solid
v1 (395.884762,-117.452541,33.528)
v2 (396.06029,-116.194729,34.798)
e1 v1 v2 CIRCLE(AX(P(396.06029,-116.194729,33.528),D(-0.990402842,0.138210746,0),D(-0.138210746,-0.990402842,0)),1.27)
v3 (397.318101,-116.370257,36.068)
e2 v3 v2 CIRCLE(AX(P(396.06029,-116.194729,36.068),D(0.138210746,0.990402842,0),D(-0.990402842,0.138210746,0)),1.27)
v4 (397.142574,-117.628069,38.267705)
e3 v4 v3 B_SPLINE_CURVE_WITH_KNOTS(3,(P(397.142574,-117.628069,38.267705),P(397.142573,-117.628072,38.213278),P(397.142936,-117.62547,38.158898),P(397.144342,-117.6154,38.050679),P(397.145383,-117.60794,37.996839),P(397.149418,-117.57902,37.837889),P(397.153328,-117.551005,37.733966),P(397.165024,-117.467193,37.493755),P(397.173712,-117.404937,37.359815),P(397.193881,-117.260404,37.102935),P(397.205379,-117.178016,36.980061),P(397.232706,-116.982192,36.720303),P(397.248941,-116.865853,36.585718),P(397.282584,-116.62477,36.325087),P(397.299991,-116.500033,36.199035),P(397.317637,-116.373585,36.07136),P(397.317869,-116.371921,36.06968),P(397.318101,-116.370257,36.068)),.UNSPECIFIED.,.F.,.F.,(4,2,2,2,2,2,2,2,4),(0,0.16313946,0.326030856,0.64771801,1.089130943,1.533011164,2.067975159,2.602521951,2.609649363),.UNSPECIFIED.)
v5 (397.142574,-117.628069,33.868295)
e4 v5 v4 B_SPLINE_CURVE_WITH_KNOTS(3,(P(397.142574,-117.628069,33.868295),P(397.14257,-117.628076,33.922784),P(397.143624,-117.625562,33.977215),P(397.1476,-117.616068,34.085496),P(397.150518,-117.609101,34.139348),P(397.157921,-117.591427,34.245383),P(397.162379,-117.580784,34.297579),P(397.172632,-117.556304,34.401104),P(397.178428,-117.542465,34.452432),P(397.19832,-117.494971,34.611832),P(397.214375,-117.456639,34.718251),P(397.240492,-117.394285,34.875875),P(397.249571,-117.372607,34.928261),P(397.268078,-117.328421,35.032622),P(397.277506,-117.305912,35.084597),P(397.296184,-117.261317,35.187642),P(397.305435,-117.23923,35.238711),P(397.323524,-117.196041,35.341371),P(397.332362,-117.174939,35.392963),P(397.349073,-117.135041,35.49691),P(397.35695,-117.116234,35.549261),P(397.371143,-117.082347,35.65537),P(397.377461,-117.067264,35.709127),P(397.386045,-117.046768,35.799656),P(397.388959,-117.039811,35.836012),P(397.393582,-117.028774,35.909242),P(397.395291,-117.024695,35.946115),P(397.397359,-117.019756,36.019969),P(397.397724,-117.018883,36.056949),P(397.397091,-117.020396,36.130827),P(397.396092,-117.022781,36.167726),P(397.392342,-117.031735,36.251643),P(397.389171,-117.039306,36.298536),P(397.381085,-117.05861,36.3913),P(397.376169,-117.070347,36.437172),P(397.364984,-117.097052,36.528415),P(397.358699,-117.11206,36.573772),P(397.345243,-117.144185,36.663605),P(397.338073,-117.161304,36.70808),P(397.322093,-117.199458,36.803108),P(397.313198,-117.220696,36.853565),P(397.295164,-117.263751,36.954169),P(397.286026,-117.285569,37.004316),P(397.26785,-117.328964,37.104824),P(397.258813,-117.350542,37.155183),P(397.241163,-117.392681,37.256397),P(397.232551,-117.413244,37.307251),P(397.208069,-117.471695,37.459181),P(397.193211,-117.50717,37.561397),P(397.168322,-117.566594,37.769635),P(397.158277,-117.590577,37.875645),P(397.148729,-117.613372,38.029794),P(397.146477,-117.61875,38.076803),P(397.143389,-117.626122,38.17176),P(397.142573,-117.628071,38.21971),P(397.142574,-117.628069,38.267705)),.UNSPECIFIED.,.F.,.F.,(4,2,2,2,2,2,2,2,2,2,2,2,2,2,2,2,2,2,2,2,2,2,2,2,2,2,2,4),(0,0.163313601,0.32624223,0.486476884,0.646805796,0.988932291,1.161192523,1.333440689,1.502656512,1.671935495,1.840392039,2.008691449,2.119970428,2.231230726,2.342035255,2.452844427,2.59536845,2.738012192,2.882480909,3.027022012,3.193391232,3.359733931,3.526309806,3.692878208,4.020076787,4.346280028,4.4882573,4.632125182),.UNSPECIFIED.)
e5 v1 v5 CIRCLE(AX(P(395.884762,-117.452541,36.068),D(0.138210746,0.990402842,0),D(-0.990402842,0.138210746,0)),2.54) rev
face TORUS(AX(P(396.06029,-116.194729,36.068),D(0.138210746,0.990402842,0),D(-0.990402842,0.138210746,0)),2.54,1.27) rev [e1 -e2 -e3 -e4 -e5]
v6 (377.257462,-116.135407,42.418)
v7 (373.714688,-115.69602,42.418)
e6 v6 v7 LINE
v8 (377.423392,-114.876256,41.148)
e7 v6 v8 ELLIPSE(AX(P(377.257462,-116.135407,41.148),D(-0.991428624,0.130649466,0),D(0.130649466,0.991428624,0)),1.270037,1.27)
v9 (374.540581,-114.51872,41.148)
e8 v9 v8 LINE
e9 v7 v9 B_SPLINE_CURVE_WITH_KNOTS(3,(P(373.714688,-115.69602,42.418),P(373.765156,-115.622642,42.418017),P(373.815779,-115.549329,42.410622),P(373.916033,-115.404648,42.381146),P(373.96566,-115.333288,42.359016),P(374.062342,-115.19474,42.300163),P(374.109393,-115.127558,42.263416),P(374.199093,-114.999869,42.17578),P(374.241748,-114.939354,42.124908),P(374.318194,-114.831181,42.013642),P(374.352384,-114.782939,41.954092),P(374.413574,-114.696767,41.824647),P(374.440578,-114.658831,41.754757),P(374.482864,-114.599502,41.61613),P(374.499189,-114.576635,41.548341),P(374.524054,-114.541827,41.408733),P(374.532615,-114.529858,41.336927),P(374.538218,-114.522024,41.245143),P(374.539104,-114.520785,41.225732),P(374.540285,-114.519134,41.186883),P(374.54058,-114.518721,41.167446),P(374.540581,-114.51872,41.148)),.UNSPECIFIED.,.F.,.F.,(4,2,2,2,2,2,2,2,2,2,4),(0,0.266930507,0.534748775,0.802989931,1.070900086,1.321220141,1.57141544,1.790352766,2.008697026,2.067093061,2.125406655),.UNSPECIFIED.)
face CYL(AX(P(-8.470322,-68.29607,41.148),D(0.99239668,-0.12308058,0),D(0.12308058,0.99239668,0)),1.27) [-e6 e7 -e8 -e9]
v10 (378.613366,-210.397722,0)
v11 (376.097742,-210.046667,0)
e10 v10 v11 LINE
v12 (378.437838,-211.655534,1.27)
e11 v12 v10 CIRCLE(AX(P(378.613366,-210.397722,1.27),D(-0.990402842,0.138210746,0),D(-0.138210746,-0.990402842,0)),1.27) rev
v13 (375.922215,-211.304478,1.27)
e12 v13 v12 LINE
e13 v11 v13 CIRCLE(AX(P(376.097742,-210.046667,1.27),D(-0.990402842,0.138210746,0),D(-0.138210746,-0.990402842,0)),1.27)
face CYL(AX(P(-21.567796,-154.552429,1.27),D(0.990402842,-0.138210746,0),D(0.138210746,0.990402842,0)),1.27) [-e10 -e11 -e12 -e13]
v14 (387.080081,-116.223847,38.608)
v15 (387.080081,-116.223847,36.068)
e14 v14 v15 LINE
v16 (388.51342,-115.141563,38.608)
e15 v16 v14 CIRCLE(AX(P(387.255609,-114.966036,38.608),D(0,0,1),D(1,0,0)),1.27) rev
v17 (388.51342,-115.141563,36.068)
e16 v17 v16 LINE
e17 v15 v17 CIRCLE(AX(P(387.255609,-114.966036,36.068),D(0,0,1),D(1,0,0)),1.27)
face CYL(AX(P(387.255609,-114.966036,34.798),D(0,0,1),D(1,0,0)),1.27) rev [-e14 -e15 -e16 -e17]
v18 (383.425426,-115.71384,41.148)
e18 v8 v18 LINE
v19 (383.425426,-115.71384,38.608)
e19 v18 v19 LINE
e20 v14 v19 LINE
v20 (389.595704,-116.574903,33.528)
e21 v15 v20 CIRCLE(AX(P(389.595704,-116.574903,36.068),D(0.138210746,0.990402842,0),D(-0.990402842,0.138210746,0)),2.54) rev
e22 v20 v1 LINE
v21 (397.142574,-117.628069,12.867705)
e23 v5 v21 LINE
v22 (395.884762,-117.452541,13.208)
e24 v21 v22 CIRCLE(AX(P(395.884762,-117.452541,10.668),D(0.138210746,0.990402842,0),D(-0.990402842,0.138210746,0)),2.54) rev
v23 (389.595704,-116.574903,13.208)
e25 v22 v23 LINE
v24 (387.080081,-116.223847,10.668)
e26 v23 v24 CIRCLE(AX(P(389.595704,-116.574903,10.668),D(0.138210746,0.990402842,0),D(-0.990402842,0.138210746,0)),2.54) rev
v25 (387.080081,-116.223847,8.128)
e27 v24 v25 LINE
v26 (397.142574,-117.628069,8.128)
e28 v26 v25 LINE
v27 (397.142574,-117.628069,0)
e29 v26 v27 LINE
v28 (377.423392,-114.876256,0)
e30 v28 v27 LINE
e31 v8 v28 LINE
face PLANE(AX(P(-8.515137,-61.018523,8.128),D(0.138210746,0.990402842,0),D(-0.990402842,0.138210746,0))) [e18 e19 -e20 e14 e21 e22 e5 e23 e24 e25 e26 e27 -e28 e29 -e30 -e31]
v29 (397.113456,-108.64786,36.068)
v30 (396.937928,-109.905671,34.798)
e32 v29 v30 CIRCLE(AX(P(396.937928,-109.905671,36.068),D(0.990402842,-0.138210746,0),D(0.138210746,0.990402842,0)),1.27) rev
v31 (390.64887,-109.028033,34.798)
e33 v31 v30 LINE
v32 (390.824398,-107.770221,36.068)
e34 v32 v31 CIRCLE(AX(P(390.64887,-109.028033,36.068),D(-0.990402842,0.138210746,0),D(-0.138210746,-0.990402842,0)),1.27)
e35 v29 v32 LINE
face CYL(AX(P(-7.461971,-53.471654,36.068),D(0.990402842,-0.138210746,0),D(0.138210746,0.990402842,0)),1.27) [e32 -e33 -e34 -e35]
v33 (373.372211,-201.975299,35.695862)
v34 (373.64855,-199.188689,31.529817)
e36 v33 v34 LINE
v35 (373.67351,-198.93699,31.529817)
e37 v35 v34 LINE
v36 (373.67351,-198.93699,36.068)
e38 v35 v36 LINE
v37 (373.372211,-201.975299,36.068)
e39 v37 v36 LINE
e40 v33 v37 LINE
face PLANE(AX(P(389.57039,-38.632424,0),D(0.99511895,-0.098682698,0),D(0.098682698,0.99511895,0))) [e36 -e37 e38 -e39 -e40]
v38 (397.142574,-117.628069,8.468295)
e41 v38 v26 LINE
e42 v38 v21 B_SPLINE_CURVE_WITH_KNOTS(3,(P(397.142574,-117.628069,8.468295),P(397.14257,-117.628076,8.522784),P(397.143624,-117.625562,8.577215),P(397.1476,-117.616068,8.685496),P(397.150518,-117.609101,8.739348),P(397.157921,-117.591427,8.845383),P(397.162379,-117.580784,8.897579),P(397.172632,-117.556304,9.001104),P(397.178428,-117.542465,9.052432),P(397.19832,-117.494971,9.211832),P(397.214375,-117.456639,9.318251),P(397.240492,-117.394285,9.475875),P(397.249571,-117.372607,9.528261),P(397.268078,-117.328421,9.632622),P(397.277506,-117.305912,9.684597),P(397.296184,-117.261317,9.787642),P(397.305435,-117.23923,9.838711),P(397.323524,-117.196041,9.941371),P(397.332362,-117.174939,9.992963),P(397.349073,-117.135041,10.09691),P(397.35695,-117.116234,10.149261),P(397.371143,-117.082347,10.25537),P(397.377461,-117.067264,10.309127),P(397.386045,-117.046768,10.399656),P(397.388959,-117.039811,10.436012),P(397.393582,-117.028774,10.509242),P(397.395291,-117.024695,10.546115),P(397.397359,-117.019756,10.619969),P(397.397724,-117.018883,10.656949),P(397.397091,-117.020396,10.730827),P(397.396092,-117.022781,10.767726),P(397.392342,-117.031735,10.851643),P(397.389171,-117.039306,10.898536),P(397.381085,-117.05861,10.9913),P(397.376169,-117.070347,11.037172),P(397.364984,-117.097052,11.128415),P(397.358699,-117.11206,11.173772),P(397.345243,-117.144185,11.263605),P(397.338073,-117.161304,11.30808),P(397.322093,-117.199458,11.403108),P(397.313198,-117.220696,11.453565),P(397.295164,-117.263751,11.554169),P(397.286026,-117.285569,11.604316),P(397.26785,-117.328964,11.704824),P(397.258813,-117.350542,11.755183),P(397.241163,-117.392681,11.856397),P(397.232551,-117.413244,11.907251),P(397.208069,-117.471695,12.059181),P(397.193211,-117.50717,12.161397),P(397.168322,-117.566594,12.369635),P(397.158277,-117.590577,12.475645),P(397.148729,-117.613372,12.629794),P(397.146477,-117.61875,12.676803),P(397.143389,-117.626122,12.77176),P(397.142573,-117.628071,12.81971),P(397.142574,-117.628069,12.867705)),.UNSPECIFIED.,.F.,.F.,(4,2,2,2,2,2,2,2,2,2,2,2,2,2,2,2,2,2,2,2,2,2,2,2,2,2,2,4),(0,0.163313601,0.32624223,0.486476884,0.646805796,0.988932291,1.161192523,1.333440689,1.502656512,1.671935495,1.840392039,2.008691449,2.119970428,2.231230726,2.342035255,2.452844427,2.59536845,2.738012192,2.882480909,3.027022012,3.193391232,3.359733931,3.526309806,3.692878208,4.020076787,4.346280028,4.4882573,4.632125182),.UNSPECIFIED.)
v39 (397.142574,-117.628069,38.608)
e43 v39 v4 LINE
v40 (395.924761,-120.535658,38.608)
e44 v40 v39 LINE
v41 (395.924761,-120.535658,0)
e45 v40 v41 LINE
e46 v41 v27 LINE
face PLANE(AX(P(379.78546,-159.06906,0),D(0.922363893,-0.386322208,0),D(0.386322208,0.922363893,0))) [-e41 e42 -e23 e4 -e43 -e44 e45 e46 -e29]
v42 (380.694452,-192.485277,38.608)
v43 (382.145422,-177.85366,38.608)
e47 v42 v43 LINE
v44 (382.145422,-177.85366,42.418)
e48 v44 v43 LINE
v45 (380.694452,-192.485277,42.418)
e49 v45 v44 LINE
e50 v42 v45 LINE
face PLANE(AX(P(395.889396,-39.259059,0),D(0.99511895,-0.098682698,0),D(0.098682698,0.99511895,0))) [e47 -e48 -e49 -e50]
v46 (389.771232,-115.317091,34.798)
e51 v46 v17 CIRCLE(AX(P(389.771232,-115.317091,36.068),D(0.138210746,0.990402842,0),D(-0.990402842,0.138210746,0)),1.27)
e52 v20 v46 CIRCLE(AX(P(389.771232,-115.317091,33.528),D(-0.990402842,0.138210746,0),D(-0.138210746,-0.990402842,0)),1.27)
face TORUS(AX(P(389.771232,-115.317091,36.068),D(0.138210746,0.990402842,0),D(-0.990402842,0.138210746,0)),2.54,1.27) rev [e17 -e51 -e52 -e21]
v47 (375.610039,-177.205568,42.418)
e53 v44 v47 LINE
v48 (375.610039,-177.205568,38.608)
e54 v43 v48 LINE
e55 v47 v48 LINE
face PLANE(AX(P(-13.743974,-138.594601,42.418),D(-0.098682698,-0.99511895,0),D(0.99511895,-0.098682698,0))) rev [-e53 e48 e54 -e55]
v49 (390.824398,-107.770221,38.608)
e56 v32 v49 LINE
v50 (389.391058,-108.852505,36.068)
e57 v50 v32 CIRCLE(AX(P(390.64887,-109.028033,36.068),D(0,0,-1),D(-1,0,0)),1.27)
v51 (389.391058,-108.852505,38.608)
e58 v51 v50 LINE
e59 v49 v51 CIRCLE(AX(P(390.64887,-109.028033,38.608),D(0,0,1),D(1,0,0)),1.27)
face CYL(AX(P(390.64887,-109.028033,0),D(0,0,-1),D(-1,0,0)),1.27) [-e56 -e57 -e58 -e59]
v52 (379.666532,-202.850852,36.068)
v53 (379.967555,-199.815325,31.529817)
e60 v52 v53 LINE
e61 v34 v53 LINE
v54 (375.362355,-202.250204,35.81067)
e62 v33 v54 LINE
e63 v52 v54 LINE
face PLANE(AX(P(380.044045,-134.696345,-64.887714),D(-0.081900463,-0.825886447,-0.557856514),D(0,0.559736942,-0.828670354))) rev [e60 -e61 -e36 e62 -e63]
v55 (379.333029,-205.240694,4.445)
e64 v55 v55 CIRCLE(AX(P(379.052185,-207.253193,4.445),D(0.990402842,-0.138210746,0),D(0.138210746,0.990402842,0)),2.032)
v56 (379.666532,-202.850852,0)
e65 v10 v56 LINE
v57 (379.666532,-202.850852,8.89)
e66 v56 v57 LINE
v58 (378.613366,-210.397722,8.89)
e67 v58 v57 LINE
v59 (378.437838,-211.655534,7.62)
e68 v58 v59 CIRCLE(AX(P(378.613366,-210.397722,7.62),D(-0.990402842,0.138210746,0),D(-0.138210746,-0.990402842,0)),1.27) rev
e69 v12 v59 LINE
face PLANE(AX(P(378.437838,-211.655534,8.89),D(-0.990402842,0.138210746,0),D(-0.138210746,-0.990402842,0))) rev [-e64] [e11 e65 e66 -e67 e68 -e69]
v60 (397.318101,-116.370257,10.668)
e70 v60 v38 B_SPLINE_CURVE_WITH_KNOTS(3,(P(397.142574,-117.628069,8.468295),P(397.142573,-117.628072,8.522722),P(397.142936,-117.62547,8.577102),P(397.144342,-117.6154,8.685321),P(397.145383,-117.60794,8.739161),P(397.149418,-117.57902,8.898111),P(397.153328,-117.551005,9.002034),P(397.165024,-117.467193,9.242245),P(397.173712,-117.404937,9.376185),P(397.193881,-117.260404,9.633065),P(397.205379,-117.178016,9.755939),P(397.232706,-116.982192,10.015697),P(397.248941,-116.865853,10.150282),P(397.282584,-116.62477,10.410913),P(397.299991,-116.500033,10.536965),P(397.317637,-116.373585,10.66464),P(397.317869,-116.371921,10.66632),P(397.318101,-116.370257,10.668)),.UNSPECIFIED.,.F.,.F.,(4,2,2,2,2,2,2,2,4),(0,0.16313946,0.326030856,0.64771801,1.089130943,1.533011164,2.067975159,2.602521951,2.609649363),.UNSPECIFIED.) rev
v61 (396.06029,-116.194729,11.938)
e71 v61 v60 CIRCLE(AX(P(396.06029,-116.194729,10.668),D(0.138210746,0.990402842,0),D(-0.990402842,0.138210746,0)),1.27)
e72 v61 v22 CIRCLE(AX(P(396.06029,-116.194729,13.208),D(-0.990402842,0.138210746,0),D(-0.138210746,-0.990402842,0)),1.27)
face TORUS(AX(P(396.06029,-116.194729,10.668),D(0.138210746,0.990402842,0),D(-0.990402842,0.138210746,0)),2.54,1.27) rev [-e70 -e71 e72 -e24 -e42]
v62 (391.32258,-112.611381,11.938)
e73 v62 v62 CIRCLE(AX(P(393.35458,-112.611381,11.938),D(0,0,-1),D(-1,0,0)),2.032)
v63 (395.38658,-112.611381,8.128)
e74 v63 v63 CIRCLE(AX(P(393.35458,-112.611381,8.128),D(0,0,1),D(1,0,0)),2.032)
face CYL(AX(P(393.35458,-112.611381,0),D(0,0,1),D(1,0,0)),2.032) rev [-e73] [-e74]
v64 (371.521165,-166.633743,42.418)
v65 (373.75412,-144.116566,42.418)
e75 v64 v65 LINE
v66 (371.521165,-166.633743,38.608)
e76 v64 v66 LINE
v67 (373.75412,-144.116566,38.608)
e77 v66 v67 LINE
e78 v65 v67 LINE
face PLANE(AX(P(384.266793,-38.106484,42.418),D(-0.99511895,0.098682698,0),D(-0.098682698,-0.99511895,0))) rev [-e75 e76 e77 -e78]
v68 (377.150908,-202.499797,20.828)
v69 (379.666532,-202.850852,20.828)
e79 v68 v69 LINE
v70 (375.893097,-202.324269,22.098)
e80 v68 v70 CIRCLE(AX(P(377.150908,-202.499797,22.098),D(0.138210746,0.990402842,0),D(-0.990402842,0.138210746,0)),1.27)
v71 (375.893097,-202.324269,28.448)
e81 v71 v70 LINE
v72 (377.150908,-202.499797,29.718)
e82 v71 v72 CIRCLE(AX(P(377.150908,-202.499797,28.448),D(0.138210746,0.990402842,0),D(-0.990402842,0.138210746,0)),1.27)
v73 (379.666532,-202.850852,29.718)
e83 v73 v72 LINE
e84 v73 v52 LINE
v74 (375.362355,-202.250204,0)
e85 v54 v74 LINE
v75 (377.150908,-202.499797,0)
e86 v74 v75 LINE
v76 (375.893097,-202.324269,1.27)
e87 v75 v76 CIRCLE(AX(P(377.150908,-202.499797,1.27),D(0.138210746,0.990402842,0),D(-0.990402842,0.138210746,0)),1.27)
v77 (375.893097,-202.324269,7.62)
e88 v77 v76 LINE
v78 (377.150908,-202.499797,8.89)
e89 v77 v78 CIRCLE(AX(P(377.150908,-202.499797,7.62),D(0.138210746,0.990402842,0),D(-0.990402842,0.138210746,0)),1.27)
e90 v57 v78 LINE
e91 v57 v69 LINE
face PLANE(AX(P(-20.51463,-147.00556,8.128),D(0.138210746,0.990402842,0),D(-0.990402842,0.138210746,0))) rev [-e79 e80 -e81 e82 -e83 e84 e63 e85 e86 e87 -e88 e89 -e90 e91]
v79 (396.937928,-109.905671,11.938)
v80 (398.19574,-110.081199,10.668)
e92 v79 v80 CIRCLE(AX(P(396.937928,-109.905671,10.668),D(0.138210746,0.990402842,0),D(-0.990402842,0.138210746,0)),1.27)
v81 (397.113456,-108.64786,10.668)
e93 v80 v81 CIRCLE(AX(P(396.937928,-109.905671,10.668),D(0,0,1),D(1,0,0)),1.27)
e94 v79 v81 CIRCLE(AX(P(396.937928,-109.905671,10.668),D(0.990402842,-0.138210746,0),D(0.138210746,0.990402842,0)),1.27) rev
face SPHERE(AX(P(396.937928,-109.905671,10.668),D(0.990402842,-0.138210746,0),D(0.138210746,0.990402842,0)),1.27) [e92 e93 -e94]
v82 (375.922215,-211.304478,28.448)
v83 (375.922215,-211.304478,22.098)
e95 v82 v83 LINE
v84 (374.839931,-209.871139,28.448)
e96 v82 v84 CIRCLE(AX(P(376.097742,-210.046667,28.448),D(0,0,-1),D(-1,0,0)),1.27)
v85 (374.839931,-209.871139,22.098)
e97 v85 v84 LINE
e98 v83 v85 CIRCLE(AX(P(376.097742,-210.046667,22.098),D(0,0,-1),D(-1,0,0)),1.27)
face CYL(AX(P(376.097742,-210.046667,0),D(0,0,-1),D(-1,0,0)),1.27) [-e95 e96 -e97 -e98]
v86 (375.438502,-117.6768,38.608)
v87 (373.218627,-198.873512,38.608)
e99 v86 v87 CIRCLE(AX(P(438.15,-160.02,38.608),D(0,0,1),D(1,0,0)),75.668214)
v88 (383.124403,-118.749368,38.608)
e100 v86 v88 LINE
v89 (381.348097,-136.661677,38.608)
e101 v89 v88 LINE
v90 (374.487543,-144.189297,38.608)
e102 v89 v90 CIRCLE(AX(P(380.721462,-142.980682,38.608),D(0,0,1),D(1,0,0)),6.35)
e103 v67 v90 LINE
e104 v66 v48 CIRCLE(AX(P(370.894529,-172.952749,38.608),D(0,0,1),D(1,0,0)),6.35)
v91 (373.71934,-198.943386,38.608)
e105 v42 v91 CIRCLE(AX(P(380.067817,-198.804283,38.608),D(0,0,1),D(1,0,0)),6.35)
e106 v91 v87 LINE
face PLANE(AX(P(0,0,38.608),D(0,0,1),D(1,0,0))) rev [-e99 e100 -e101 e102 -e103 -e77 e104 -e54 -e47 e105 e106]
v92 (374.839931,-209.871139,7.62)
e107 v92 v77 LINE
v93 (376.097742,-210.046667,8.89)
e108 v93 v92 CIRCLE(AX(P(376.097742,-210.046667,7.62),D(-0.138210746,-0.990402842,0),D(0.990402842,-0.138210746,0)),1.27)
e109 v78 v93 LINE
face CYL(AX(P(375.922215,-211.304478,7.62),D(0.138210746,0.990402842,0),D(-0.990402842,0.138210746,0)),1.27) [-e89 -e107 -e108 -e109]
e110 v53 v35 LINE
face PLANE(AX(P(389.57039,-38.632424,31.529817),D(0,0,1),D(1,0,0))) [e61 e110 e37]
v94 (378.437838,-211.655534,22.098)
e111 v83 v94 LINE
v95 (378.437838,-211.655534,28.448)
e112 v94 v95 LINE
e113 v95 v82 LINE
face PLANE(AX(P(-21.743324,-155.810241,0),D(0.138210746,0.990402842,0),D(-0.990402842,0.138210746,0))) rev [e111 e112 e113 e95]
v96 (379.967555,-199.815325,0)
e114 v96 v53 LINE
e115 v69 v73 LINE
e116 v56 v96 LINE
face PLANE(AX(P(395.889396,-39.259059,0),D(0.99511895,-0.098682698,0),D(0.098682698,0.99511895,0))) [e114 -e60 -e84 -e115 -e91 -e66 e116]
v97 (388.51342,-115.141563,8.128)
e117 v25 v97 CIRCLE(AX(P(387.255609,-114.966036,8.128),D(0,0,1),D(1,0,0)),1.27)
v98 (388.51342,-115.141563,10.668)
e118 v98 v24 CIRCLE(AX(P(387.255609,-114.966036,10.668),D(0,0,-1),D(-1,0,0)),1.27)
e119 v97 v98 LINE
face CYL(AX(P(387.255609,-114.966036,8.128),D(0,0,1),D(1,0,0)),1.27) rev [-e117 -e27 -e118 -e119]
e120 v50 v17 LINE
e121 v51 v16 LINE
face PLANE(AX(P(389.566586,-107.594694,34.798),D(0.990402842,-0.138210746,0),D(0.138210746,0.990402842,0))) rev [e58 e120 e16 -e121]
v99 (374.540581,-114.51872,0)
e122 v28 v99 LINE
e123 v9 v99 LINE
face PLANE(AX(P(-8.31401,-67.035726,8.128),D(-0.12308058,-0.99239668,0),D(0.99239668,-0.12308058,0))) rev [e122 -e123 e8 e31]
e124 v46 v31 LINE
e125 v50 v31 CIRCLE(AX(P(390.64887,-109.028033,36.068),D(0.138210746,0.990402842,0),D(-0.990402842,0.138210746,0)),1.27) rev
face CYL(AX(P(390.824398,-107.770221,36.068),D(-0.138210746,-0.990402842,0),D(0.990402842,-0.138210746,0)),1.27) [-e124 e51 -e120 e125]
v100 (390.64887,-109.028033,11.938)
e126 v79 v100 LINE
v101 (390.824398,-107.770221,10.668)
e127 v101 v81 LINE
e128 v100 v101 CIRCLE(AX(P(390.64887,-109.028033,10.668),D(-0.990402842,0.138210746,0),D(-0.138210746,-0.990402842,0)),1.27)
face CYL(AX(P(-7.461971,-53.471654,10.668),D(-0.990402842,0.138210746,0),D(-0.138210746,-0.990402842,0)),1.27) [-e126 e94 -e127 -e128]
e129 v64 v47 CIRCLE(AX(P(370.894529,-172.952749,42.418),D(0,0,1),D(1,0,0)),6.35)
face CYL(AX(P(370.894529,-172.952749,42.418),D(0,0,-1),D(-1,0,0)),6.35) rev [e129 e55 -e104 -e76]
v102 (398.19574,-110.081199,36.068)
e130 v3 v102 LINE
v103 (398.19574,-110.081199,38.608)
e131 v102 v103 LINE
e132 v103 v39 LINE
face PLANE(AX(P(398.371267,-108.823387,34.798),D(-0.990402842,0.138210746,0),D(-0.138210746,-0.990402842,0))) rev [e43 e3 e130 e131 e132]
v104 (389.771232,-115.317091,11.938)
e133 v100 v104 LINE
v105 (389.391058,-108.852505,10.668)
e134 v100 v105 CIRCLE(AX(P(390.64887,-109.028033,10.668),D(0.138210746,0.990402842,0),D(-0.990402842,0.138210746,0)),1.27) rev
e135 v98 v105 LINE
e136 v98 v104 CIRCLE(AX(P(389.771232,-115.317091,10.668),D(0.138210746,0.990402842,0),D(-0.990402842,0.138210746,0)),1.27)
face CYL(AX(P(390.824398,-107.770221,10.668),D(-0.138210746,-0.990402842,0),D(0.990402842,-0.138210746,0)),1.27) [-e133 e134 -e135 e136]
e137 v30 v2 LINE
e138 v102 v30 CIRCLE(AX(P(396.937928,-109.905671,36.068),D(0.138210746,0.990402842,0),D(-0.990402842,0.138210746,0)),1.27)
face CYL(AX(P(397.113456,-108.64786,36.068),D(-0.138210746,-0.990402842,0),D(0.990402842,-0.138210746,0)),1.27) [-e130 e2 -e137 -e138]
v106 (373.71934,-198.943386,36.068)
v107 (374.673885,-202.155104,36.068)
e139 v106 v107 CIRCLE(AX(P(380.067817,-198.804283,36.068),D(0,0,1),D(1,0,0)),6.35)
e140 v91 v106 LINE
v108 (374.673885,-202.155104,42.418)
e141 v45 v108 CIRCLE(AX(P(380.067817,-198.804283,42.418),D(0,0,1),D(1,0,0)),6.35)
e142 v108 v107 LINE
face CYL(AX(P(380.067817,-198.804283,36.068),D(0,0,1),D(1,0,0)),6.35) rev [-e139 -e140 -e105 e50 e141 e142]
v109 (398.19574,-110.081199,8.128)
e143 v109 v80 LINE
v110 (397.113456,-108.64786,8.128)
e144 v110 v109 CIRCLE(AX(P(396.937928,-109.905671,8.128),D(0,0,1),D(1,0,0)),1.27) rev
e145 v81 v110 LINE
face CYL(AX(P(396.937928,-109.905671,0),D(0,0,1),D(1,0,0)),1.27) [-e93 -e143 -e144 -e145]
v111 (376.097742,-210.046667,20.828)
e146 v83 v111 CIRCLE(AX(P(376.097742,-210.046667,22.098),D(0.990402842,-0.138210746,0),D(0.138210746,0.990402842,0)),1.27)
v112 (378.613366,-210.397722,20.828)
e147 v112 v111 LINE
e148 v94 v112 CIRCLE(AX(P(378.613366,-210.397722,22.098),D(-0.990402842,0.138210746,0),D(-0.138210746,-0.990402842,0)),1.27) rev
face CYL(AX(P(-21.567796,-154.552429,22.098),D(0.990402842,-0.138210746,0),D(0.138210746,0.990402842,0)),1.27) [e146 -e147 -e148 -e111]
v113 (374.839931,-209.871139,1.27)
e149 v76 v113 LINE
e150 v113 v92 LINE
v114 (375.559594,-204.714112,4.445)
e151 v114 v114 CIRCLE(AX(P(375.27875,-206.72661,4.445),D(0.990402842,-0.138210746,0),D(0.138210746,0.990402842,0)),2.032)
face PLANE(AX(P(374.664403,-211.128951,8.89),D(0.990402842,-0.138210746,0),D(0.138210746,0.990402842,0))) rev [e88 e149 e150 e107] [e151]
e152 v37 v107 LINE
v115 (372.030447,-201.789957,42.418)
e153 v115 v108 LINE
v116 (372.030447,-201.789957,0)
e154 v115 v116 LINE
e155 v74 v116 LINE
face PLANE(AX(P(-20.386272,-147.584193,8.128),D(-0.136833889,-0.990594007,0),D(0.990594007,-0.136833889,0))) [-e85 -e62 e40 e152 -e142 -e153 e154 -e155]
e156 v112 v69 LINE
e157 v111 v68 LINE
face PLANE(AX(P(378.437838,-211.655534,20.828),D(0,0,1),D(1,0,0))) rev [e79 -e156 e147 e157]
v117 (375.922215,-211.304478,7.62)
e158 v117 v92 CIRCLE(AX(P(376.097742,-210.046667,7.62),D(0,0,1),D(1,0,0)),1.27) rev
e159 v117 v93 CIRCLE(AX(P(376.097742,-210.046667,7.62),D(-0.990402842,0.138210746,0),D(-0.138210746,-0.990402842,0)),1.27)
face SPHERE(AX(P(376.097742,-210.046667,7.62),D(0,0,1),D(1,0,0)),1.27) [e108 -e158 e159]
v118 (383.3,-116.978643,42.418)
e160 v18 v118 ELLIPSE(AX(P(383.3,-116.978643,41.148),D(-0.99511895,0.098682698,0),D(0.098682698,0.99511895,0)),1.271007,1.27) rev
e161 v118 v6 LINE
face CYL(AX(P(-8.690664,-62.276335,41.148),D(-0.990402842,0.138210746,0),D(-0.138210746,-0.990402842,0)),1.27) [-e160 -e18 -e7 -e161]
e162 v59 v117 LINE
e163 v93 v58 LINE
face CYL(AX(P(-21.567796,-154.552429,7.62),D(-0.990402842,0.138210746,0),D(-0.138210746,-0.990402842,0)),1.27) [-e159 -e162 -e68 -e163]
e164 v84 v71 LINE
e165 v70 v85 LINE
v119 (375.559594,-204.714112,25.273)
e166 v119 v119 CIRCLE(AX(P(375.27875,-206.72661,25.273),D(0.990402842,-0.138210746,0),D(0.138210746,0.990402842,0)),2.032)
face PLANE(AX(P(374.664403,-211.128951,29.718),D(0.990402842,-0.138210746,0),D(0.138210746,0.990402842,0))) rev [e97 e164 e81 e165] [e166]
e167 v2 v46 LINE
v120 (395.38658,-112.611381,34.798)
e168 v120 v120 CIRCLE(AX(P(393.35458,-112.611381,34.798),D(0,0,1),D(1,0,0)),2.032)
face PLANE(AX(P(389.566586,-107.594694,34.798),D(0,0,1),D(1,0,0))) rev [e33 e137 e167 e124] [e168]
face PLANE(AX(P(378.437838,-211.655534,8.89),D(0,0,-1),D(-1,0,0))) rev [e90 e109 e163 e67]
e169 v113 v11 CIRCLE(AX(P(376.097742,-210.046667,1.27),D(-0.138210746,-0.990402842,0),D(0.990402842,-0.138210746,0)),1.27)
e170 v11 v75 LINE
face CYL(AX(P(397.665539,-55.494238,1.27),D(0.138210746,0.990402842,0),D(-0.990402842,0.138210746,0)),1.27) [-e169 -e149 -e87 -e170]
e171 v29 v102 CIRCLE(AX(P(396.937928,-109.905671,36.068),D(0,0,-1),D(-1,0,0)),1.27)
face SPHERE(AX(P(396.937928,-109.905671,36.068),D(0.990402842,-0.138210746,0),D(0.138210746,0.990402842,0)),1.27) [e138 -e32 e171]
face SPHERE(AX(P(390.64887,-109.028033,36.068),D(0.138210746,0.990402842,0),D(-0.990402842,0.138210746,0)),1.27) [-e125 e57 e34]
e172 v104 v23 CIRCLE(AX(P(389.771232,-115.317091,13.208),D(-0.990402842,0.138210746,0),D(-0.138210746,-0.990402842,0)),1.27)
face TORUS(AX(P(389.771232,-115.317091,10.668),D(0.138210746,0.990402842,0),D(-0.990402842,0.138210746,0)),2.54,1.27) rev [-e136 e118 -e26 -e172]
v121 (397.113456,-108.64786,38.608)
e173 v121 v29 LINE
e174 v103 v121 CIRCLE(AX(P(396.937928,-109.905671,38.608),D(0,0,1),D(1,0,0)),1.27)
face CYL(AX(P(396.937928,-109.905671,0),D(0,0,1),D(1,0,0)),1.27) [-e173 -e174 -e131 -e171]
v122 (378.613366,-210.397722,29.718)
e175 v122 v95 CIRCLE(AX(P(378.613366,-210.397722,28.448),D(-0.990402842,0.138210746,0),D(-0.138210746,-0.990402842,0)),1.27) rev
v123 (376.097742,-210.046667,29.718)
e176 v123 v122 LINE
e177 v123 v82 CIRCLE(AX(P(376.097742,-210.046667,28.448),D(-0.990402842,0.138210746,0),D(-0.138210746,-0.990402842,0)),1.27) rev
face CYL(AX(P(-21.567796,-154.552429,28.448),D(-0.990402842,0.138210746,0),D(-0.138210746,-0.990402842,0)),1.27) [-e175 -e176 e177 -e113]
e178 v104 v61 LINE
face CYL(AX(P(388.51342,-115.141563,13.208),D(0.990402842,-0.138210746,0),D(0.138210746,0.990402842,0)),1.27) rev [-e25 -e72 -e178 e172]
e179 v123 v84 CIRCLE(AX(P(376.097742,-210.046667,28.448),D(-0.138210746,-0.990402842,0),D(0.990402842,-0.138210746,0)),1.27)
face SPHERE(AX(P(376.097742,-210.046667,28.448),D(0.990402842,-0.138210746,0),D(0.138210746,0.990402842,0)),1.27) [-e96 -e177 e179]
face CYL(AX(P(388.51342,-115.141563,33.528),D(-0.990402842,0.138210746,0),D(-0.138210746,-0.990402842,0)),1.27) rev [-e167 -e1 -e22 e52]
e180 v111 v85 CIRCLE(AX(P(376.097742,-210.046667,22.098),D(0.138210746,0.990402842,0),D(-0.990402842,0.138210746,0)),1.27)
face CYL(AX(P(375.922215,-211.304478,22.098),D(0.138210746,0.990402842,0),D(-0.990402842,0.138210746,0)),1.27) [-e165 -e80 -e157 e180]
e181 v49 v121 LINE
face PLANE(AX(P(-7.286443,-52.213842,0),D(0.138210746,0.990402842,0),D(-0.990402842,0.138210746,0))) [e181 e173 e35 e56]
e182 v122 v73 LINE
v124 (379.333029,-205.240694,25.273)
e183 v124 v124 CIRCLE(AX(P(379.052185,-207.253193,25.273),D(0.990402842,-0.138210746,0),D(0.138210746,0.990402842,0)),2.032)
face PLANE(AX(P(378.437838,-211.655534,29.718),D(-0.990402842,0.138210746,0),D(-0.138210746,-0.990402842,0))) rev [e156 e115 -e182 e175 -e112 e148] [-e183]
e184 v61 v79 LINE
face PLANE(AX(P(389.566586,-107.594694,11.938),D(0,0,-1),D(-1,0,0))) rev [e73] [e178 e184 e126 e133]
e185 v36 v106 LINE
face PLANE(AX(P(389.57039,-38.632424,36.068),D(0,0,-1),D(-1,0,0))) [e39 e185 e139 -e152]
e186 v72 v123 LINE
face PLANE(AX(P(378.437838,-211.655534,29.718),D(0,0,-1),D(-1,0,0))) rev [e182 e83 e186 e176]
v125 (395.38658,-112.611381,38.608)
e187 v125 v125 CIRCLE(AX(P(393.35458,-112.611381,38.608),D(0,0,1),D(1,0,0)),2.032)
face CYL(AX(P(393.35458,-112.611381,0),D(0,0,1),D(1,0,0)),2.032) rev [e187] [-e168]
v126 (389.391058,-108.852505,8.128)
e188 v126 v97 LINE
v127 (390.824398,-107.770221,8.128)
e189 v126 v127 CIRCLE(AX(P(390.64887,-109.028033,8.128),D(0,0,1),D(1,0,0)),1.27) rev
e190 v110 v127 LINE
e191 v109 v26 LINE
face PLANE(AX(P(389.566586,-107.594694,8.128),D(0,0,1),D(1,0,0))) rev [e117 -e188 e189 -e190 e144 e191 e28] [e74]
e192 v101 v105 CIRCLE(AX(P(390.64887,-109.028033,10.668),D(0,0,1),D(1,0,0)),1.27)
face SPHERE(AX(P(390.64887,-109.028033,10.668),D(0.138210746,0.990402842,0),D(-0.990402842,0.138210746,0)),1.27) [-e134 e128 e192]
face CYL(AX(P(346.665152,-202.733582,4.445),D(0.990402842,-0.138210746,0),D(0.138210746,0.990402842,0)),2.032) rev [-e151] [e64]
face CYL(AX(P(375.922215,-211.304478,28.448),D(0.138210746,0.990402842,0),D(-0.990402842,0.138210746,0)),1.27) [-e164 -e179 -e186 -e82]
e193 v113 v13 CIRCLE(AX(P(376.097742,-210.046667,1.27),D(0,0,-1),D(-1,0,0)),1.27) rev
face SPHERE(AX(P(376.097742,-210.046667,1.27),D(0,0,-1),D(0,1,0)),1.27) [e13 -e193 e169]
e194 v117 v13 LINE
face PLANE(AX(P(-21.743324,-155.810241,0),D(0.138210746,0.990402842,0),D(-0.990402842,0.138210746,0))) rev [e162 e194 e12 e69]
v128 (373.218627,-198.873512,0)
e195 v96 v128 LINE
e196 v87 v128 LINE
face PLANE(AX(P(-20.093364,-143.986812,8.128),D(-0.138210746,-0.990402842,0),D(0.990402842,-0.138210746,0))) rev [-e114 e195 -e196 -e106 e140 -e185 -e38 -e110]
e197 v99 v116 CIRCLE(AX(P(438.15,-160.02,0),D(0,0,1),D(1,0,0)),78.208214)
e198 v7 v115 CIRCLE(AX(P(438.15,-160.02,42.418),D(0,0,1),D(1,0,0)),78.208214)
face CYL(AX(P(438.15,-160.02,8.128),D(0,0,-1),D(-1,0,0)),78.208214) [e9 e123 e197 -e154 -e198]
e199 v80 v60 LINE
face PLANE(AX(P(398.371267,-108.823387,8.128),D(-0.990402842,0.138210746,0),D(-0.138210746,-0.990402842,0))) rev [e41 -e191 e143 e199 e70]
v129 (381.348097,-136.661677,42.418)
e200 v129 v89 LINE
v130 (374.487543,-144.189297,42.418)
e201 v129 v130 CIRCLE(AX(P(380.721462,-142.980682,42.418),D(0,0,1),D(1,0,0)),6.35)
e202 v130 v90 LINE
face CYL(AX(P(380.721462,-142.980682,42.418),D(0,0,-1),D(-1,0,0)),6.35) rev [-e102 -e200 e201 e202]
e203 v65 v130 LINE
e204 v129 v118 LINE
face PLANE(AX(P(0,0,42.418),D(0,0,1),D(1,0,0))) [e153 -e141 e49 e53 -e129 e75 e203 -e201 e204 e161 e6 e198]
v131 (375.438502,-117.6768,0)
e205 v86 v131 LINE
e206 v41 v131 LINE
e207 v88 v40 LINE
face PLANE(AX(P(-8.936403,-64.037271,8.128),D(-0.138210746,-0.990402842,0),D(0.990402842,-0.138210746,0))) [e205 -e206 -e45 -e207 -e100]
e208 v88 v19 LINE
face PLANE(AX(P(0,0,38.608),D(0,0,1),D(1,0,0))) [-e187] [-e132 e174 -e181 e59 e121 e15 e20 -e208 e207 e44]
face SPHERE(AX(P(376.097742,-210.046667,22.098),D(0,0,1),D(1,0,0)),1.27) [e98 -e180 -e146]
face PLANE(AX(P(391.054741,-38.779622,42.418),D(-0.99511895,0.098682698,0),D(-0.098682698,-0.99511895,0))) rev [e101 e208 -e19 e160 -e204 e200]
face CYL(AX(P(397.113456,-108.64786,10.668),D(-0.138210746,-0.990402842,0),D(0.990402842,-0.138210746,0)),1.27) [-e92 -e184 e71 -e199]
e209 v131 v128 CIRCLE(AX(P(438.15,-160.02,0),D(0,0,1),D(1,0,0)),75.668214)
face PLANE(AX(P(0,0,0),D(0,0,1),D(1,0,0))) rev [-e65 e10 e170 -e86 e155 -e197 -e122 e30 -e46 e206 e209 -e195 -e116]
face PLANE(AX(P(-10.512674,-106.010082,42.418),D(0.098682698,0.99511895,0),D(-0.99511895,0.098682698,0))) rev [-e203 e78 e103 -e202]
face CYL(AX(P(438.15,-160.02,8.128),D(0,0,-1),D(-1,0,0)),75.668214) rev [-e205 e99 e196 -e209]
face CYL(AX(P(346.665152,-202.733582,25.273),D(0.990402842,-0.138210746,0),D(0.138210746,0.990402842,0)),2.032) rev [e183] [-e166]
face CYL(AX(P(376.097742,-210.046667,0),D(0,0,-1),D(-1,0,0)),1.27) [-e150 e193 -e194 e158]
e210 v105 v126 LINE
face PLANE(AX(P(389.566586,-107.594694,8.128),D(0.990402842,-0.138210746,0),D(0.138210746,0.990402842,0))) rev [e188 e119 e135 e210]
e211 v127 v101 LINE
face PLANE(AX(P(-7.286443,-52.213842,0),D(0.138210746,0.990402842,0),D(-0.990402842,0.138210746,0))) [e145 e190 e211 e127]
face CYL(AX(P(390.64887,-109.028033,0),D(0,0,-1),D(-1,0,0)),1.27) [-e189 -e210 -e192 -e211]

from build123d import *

# Parameters (mm, degrees)
SKETCH1_R              = 4.445
BOSS_EXTRUDE2_DEPTH    = 8.128
BOSS_EXTRUDE3_DEPTH    = 30.48
CUT_EXTRUDE1_START     = -38.608
CUT_EXTRUDE1_OUTLINE_R = 4.445
CUT_EXTRUDE1_DEPTH     = 38.608
BOSS_EXTRUDE13_DEPTH   = 3.81
BOSS_EXTRUDE14_DEPTH   = 8.128
SKETCH9_W              = 8.89
SKETCH9_H              = 3.81
BOSS_EXTRUDE15_DEPTH   = 8.89
SKETCH10_W             = 3.81
SKETCH10_H             = 8.89
BOSS_EXTRUDE16_DEPTH   = 8.89
SKETCH11_R             = 2.032
CUT_EXTRUDE3_DEPTH     = 453.756346398
SKETCH12_R             = 2.032
CUT_EXTRUDE4_DEPTH     = 167.419125065
FILLET1_R              = 1.27
FILLET2_R              = 1.27
FILLET3_R              = 1.27
SKETCH13_R             = 6.35
CUT_EXTRUDE5_DEPTH     = 6.35
SKETCH14_W             = 4.538183456
SKETCH14_H             = 0.271213631
CUT_EXTRUDE6_DEPTH     = 6.35


# Read off the part's stored shape, not the designer's step: Cut-Extrude1
with BuildPart() as part:
    # Sketch1 → Boss-Extrude2 (new body)
    with BuildSketch(Plane.XY):
        with BuildLine():
            Line((422.721831239, -137.260955008), (397.142573767, -117.628068619))
            Line((397.142573767, -117.628068619), (377.42339183, -114.876256201))
            Line((377.42339183, -114.876256201), (374.540581179, -114.51871973))
            ThreePointArc((374.540581179, -114.51871973), (359.974116362, -157.771470169), (372.030446696, -201.789957384))
            Line((372.030446696, -201.789957384), (375.362354889, -202.25020442))
            Line((375.362354889, -202.25020442), (407.292032563, -206.705991877))
            Line((407.292032563, -206.705991877), (428.301760664, -185.691281663))
            ThreePointArc((428.301760664, -185.691281663), (410.835199313, -163.167091308), (422.721831239, -137.260955008))
        make_face()
        with Locations((413.081283236, -189.895733265)):
            Circle(SKETCH1_R, mode=Mode.SUBTRACT)
        with BuildLine():
            Line((375.438501949, -117.676800355), (395.924761017, -120.535658409))
            Line((395.924761017, -120.535658409), (403.250926595, -126.158721416))
            Line((403.250926595, -126.158721416), (396.525446728, -140.500644454))
            ThreePointArc((396.525446728, -140.500644454), (394.840250533, -144.59682662), (393.557057048, -148.836167256))
            Line((393.557057048, -148.836167256), (408.135947471, -152.492527686))
            ThreePointArc((408.135947471, -152.492527686), (407.478732389, -164.116282679), (411.163311063, -175.160172021))
            Line((411.163311063, -175.160172021), (398.054918567, -182.514290852))
            ThreePointArc((398.054918567, -182.514290852), (404.027476783, -190.830097132), (411.692336104, -197.617881552))
            ThreePointArc((411.692336104, -197.617881552), (411.8058947, -197.693319009), (411.923337289, -197.76255486))
            Line((411.923337289, -197.76255486), (406.209814322, -203.477432695))
            Line((406.209814322, -203.477432695), (373.21862712, -198.873511552))
            ThreePointArc((373.21862712, -198.873511552), (362.510049562, -157.95204405), (375.438501949, -117.676800355))
        make_face(mode=Mode.SUBTRACT)
        with Locations((404.375009271, -140.520000011)):
            Circle(SKETCH1_R, mode=Mode.SUBTRACT)
    extrude(amount=BOSS_EXTRUDE2_DEPTH)


with BuildPart() as body_2:
    # Sketch2 → Boss-Extrude3 (new body)
    with BuildSketch(Plane.XY.offset(8.128)):
        with BuildLine():
            Line((397.142573767, -117.628068619), (377.42339183, -114.876256201))
            Line((377.42339183, -114.876256201), (374.540581179, -114.51871973))
            ThreePointArc((374.540581179, -114.51871973), (359.974116362, -157.771470169), (372.030446696, -201.789957384))
            Line((372.030446696, -201.789957384), (375.362354889, -202.25020442))
            Line((375.362354889, -202.25020442), (407.292032563, -206.705991877))
            Line((407.292032563, -206.705991877), (414.532433241, -199.463874257))
            ThreePointArc((414.532433241, -199.463874257), (409.852770309, -196.253623443), (405.604270928, -192.491282623))
            ThreePointArc((405.604270928, -192.491282623), (405.997230199, -190.639893213), (406.27151817, -188.767241124))
            ThreePointArc((406.27151817, -188.767241124), (395.867947628, -167.427396522), (398.397521154, -143.821793259))
            ThreePointArc((398.397521154, -143.821793259), (398.461114435, -137.105611235), (404.245702044, -133.692446827))
            ThreePointArc((404.245702044, -133.692446827), (407.006708255, -130.47787998), (410.071206758, -127.551201961))
            Line((410.071206758, -127.551201961), (397.142573767, -117.628068619))
        make_face()
        with BuildLine():
            ThreePointArc((403.061727172, -189.725585097), (401.059193553, -196.35778198), (397.415632908, -202.25020442))
            Line((397.415632908, -202.25020442), (373.21862712, -198.873511552))
            ThreePointArc((373.21862712, -198.873511552), (362.510049562, -157.95204405), (375.438501949, -117.676800355))
            Line((375.438501949, -117.676800355), (395.924761017, -120.535658409))
            Line((395.924761017, -120.535658409), (400.202083686, -123.818638382))
            ThreePointArc((400.202083686, -123.818638382), (401.150247915, -126.46196405), (401.831128402, -129.1864067))
            Line((401.831128402, -129.1864067), (400.808060919, -131.368073344))
            ThreePointArc((400.808060919, -131.368073344), (395.439235277, -136.441663908), (395.124115066, -143.821793259))
            ThreePointArc((395.124115066, -143.821793259), (392.848289911, -167.853501069), (403.061727172, -189.725585097))
        make_face(mode=Mode.SUBTRACT)
    extrude(amount=BOSS_EXTRUDE3_DEPTH)


with BuildPart() as cut_extrude1_tool:
    # Cut-Extrude1 outline → Cut-Extrude1 (new body)
    with BuildSketch(Plane.XY.offset(38.608).offset(CUT_EXTRUDE1_START)):
        with BuildLine():
            Line((397.142573767, -117.628068619), (395.924761017, -120.535658409))
            Line((395.924761017, -120.535658409), (400.202083686, -123.818638382))
            ThreePointArc((400.202083686, -123.818638382), (401.150247915, -126.46196405), (401.831128402, -129.1864067))
            Line((401.831128402, -129.1864067), (400.808060919, -131.368073344))
            ThreePointArc((400.808060919, -131.368073344), (395.439235277, -136.441663908), (395.124115066, -143.821793259))
            ThreePointArc((395.124115066, -143.821793259), (394.268902285, -146.306578133), (393.557057048, -148.836167256))
            ThreePointArc((393.557057048, -148.836167256), (392.580609278, -166.105992541), (398.054918568, -182.514290852))
            ThreePointArc((398.054918568, -182.514290852), (400.385798954, -186.239721497), (403.061727172, -189.725585097))
            ThreePointArc((403.061727172, -189.725585097), (401.059193553, -196.35778198), (397.415632908, -202.25020442))
            Line((397.415632908, -202.25020442), (379.967554953, -199.815324629))
            Line((379.967554953, -199.815324629), (379.666531571, -202.850852403))
            Line((379.666531571, -202.850852403), (407.292032563, -206.705991877))
            Line((407.292032563, -206.705991877), (428.301760664, -185.691281663))
            ThreePointArc((428.301760664, -185.691281663), (410.835199313, -163.167091308), (422.721831239, -137.260955008))
            Line((422.721831239, -137.260955008), (397.142573767, -117.628068619))
        make_face()
        with BuildLine():
            Line((411.923337289, -197.76255486), (411.913410508, -197.772483995))
            ThreePointArc((411.913410508, -197.772483995), (411.802759907, -197.695344929), (411.692336104, -197.617881552))
            ThreePointArc((411.692336104, -197.617881552), (411.8058947, -197.693319009), (411.923337289, -197.76255486))
        make_face(mode=Mode.SUBTRACT)
        with BuildLine():
            Line((411.163311063, -175.160172021), (400.71315601, -181.022956652))
            ThreePointArc((400.71315601, -181.022956652), (395.601784353, -165.702501323), (396.513495254, -149.57763683))
            Line((396.513495254, -149.57763683), (408.135947471, -152.492527686))
            ThreePointArc((408.135947471, -152.492527686), (407.478732389, -164.116282679), (411.163311063, -175.160172021))
        make_face(mode=Mode.SUBTRACT)
        with Locations((404.375009271, -140.520000011)):
            Circle(CUT_EXTRUDE1_OUTLINE_R, mode=Mode.SUBTRACT)
        with Locations((413.081283236, -189.895733265)):
            Circle(CUT_EXTRUDE1_OUTLINE_R, mode=Mode.SUBTRACT)
    extrude(amount=CUT_EXTRUDE1_DEPTH)


with BuildPart() as part_1:
    add(part.part)

    # Cut-Extrude1: cut by cut_extrude1_tool
    add(cut_extrude1_tool.part, mode=Mode.SUBTRACT)



with BuildPart() as body_2_1:
    add(body_2.part)

    # Cut-Extrude1: cut by cut_extrude1_tool
    add(cut_extrude1_tool.part, mode=Mode.SUBTRACT)

    # Sketch6 → Boss-Extrude13 (add)
    with BuildSketch(Plane.XY.offset(38.608)):
        with BuildLine():
            Line((377.42339183, -114.876256201), (374.540581179, -114.51871973))
            ThreePointArc((374.540581179, -114.51871973), (359.974116362, -157.771470169), (372.030446696, -201.789957384))
            Line((372.030446696, -201.789957384), (375.362354889, -202.25020442))
            Line((375.362354889, -202.25020442), (379.666531571, -202.850852403))
            Line((379.666531571, -202.850852403), (379.967554953, -199.815324629))
            Line((379.967554953, -199.815324629), (382.145421526, -177.853660286))
            Line((382.145421526, -177.853660286), (375.610038884, -177.20556772))
            ThreePointArc((375.610038884, -177.20556772), (364.972072555, -175.243382721), (371.521164554, -166.633743264))
            Line((371.521164554, -166.633743264), (373.754119512, -144.116566189))
            Line((373.754119512, -144.116566189), (374.487542914, -144.189297394))
            ThreePointArc((374.487542914, -144.189297394), (376.02820359, -138.703320505), (381.348097321, -136.661676945))
            Line((381.348097321, -136.661676945), (383.425425917, -115.713840234))
            Line((383.425425917, -115.713840234), (377.42339183, -114.876256201))
        make_face()
    extrude(amount=BOSS_EXTRUDE13_DEPTH)


with BuildPart() as part_2:
    add(part_1.part)

    add(body_2_1.part)  # Boss-Extrude14 merges body 2
    # Sketch7 → Boss-Extrude14 (add)
    with BuildSketch(Plane(origin=(0, 0, 8.128), x_dir=(-1, 0, 0), z_dir=(0, 0, -1))):
        with BuildLine():
            Line((-380.886266304, -115.359500436), (-383.425425917, -115.713840234))
            Line((-383.425425917, -115.713840234), (-383.124402536, -118.749368007))
            Line((-383.124402536, -118.749368007), (-378.816626061, -118.148217674))
            ThreePointArc((-378.816626061, -118.148217674), (-379.834773745, -116.741485643), (-380.886266304, -115.359500436))
        make_face()
    extrude(amount=BOSS_EXTRUDE14_DEPTH)

    # Sketch9 → Boss-Extrude15 (add)
    with BuildSketch(Plane(origin=(-8.515136706, -61.018523217, 0), x_dir=(0.9904028421684975, -0.13821074569136185, 0), z_dir=(0.13821074569136185, 0.9904028421684975, 0))):
        with Locations((405.143596883, -10.033)):
            Rectangle(SKETCH9_W, SKETCH9_H)
        with Locations((405.143596883, -36.703)):
            Rectangle(SKETCH9_W, SKETCH9_H)
    extrude(amount=BOSS_EXTRUDE15_DEPTH)

    # Sketch10 → Boss-Extrude16 (add)
    with BuildSketch(Plane(origin=(-20.514630148, -147.00555954, 0), x_dir=(0.9904028421684976, -0.1382107456913612, 0), z_dir=(-0.1382107456913612, -0.9904028421684976, 0))):
        with Locations((402.153979519, 25.273)):
            Rectangle(SKETCH10_W, SKETCH10_H)
        with Locations((402.153979519, 4.445)):
            Rectangle(SKETCH10_W, SKETCH10_H)
    extrude(amount=BOSS_EXTRUDE16_DEPTH)

    # Sketch11 → Cut-Extrude3 (cut, through all)
    with BuildSketch(Plane.XY.offset(38.608)):
        with Locations((393.354579898, -112.611381221)):
            Circle(SKETCH11_R)
    extrude(amount=-CUT_EXTRUDE3_DEPTH, mode=Mode.SUBTRACT)

    # Sketch12 → Cut-Extrude4 (cut, through all)
    with BuildSketch(Plane(origin=(400.181161719, -55.845292863, 0), x_dir=(0, 0, -1), z_dir=(0.9904028421684976, -0.13821074569136127, 0))):
        with Locations(Location((-25.273, -152.875066313, 0), (0, 0, 90))):
            Circle(SKETCH12_R)
        with Locations(Location((-4.445, -152.875066313, 0), (0, 0, 90))):
            Circle(SKETCH12_R)
    extrude(amount=-CUT_EXTRUDE4_DEPTH, mode=Mode.SUBTRACT)

    # Fillet1
    fillet1_edges = [part_2.edges().sort_by_distance(p)[0] for p in [
        (374.664403213, -211.128950728, 4.445),
        (375.278749978, -206.726610095, 8.89),
        (375.278749978, -206.726610095, 0),
        (376.551120627, -211.392242199, 0),
        (376.551120627, -211.392242199, 8.89),
        (375.278749978, -206.726610095, 20.828),
        (376.551120627, -211.392242199, 20.828),
        (376.551120627, -211.392242199, 29.718),
        (380.424408874, -115.295048218, 42.418),
        (388.952239264, -111.997034457, 34.798),
        (397.756920531, -113.225727986, 34.798),
        (393.968926662, -108.209040588, 34.798),
        (389.566586029, -107.594693823, 36.703),
        (398.371267296, -108.823387352, 36.703),
        (388.952239264, -111.997034457, 11.938),
        (389.566586029, -107.594693823, 10.033),
        (398.371267296, -108.823387352, 10.033),
        (393.968926662, -108.209040588, 11.938),
        (397.756920531, -113.225727986, 11.938),
        (375.981986505, -114.697487965, 42.418),
    ]]
    fillet(fillet1_edges, radius=FILLET1_R)

    # Fillet2
    # the kernel refuses this fillet: 1.27 mm, written as the material it adds along each edge
    with BuildSketch(Plane(origin=(388.3378925, -116.39937509, 10.668), x_dir=(-0.9904028421685107, 0.13821074569126718, 0), z_dir=(0, 0, -1))) as fillet2_piece_1:
        with BuildLine():
            CenterArc((FILLET2_R, FILLET2_R), FILLET2_R, 180, 90)
            Line((0, FILLET2_R), (0, 0))
            Line((0, 0), (FILLET2_R, 0))
        make_face()
    extrude(amount=2.54)
    with BuildSketch(Plane(origin=(388.3378925, -116.39937509, 38.608), x_dir=(0.1382107456913754, 0.9904028421684955, 0), z_dir=(0, 0, -1))) as fillet2_piece_2:
        with BuildLine():
            CenterArc((FILLET2_R, -FILLET2_R), FILLET2_R, 90, 90)
            Line((0, -FILLET2_R), (0, 0))
            Line((0, 0), (FILLET2_R, 0))
        make_face()
    extrude(amount=2.54)
    with BuildSketch(Plane(origin=(389.595704109, -116.574902737, 34.798), x_dir=(0.13821074569136188, 0.9904028421684975, 0), z_dir=(0.9904028421684975, -0.13821074569136185, 0))) as fillet2_piece_3:
        with BuildLine():
            CenterArc((FILLET2_R, -FILLET2_R), FILLET2_R, 90, 90)
            Line((0, -FILLET2_R), (0, 0))
            Line((0, 0), (FILLET2_R, 0))
        make_face()
    extrude(amount=6.35)
    with BuildSketch(Plane(origin=(395.884762157, -117.452540972, 11.938), x_dir=(0, 0, 1), z_dir=(-0.9904028421684975, 0.13821074569136185, 0))) as fillet2_piece_4:
        with BuildLine():
            CenterArc((FILLET2_R, FILLET2_R), FILLET2_R, 180, 90)
            Line((0, FILLET2_R), (0, 0))
            Line((0, 0), (FILLET2_R, 0))
        make_face()
    extrude(amount=6.35)
    with BuildSketch(Plane(origin=(389.595704109, -116.574902737, 36.068), x_dir=(-0.9904028421684968, 0.13821074569136593, 0), z_dir=(0, 0, 1))) as fillet2_piece_5:
        with BuildLine():
            CenterArc((1.27 + FILLET2_R, -FILLET2_R), FILLET2_R, 90, 90)
            Line((1.27 + FILLET2_R, 0), (1.27, 0))
            Line((1.27, 0), (1.27, -FILLET2_R))
        make_face()
    revolve(axis=Axis((389.595704109, -116.574902737, 36.068), (-0.13821074569136185, -0.9904028421684976, 0)), revolution_arc=90)
    with BuildSketch(Plane(origin=(395.884762157, -117.452540972, 36.068), x_dir=(-0.794049773292646, 0.11080966916708142, 0.5976672776327808), z_dir=(-0.5919313704386147, 0.08260404011695283, -0.8017442392976832))) as fillet2_piece_6_section:
        with BuildLine():
            CenterArc((1.27 + FILLET2_R, FILLET2_R), FILLET2_R, 180, 90)
            Line((1.27 + FILLET2_R, 0), (1.27, 0))
            Line((1.27, 0), (1.27, FILLET2_R))
        make_face()
    fillet2_piece_6 = revolve(axis=Axis((395.884762157, -117.452540972, 36.068), (0.13821074569136185, 0.9904028421684976, 0)), revolution_arc=233.296989237, mode=Mode.PRIVATE)
    fillet2_piece_6 = split(fillet2_piece_6, bisect_by=Plane(origin=(397.316474469, -117.212871861, 36.083951798), z_dir=(-0.9223638930566347, 0.3863222085065898, 0)), keep=Keep.TOP, mode=Mode.PRIVATE)
    add(fillet2_piece_6)
    with BuildSketch(Plane(origin=(389.595704109, -116.574902737, 10.668), x_dir=(0, 0, 1), z_dir=(0.9904028421684976, -0.13821074569136185, 0))) as fillet2_piece_7:
        with BuildLine():
            CenterArc((1.27 + FILLET2_R, -FILLET2_R), FILLET2_R, 90, 90)
            Line((1.27, -FILLET2_R), (1.27, 0))
            Line((1.27, 0), (1.27 + FILLET2_R, 0))
        make_face()
    revolve(axis=Axis((389.595704109, -116.574902737, 10.668), (-0.13821074569136185, -0.9904028421684976, 0)), revolution_arc=90)
    with BuildSketch(Plane(origin=(395.884762157, -117.452540972, 10.668), x_dir=(-0.7940497732926503, 0.11080966916709321, -0.5976672776327729), z_dir=(-0.5919313704386069, 0.08260404011695174, 0.8017442392976891))) as fillet2_piece_8_section:
        with BuildLine():
            CenterArc((1.27 + FILLET2_R, -FILLET2_R), FILLET2_R, 90, 90)
            Line((1.27, -FILLET2_R), (1.27, 0))
            Line((1.27, 0), (1.27 + FILLET2_R, 0))
        make_face()
    fillet2_piece_8 = revolve(axis=Axis((395.884762157, -117.452540972, 10.668), (-0.13821074569136185, -0.9904028421684976, 0)), revolution_arc=233.296989237, mode=Mode.PRIVATE)
    fillet2_piece_8 = split(fillet2_piece_8, bisect_by=Plane(origin=(397.316474655, -117.212871416, 10.652053572), z_dir=(-0.9223638930566347, 0.3863222085065898, 0)), keep=Keep.TOP, mode=Mode.PRIVATE)
    add(fillet2_piece_8)

    # Fillet3
    # the kernel refuses this fillet: 1.27 mm, written as the material it takes off along each edge
    with BuildSketch(Plane(origin=(376.09774247, -210.046666766, 22.098), x_dir=(-0.1382107456913612, -0.9904028421684976, 0), z_dir=(-0.9904028421684976, 0.1382107456913612, 0))) as fillet3_piece_1_section:
        Polygon((0, 0), (FILLET3_R, 0), (FILLET3_R, -FILLET3_R), (0, -FILLET3_R), align=None)
    fillet3_piece_1 = extrude(amount=FILLET3_R, mode=Mode.PRIVATE)
    fillet3_piece_1 = fillet3_piece_1 - Plane(origin=(376.09774247, -210.046666766, 22.098), x_dir=(0.0977297555112109, 0.7003205658037746, 0.7071067811865475), z_dir=(-0.9904028421684976, 0.1382107456913612, 0)) * Sphere(FILLET3_R, mode=Mode.PRIVATE)
    add(fillet3_piece_1, mode=Mode.SUBTRACT)
    with BuildSketch(Plane(origin=(374.664403213, -211.128950728, 28.448), x_dir=(0.13821074569137695, 0.9904028421684954, 0), z_dir=(0, 0, -1))) as fillet3_piece_2:
        with BuildLine():
            CenterArc((FILLET3_R, FILLET3_R), FILLET3_R, 180, 90)
            Line((0, FILLET3_R), (0, 0))
            Line((0, 0), (FILLET3_R, 0))
        make_face()
    extrude(amount=6.35, mode=Mode.SUBTRACT)
    with BuildSketch(Plane(origin=(375.893096742, -202.324269462, 29.718), x_dir=(0, 0, -1), z_dir=(-0.1382107456913612, -0.9904028421684976, 0))) as fillet3_piece_3:
        with BuildLine():
            CenterArc((FILLET3_R, FILLET3_R), FILLET3_R, 180, 90)
            Line((0, FILLET3_R), (0, 0))
            Line((0, 0), (FILLET3_R, 0))
        make_face()
    extrude(amount=7.62, mode=Mode.SUBTRACT)
    with BuildSketch(Plane(origin=(374.83993086, -209.871139119, 28.448), x_dir=(0, 0, 1), z_dir=(0.1382107456913612, 0.9904028421684976, 0))) as fillet3_piece_4:
        with BuildLine():
            CenterArc((1.27 - FILLET3_R, FILLET3_R), FILLET3_R, 270, 90)
            Line((1.27, FILLET3_R), (1.27, 0))
            Line((1.27, 0), (1.27 - FILLET3_R, 0))
        make_face()
    revolve(axis=Axis((374.83993086, -209.871139119, 28.448), (0.9904028421684976, -0.1382107456913612, 0)), revolution_arc=90, mode=Mode.SUBTRACT)

    # Sketch13 → Cut-Extrude5 (cut)
    with BuildSketch(Plane.XY.offset(42.418)):
        with Locations((380.067816669, -198.804282819)):
            Circle(SKETCH13_R)
    extrude(amount=-CUT_EXTRUDE5_DEPTH, mode=Mode.SUBTRACT)

    # Sketch14 → Cut-Extrude6 (cut)
    with BuildSketch(Plane(origin=(395.889395758, -39.259059252, 0), x_dir=(0, 0, -1), z_dir=(0.9951189501977515, -0.0986826983686861, 0))):
        with Locations((-33.798908272, -161.208185649)):
            Rectangle(SKETCH14_W, SKETCH14_H)
        Polygon((-36.068, -161.343792464), (-36.068, -164.394209474), (-31.529816544, -161.343792464), align=None)
    extrude(amount=-CUT_EXTRUDE6_DEPTH, mode=Mode.SUBTRACT)


solid = part_2.part
